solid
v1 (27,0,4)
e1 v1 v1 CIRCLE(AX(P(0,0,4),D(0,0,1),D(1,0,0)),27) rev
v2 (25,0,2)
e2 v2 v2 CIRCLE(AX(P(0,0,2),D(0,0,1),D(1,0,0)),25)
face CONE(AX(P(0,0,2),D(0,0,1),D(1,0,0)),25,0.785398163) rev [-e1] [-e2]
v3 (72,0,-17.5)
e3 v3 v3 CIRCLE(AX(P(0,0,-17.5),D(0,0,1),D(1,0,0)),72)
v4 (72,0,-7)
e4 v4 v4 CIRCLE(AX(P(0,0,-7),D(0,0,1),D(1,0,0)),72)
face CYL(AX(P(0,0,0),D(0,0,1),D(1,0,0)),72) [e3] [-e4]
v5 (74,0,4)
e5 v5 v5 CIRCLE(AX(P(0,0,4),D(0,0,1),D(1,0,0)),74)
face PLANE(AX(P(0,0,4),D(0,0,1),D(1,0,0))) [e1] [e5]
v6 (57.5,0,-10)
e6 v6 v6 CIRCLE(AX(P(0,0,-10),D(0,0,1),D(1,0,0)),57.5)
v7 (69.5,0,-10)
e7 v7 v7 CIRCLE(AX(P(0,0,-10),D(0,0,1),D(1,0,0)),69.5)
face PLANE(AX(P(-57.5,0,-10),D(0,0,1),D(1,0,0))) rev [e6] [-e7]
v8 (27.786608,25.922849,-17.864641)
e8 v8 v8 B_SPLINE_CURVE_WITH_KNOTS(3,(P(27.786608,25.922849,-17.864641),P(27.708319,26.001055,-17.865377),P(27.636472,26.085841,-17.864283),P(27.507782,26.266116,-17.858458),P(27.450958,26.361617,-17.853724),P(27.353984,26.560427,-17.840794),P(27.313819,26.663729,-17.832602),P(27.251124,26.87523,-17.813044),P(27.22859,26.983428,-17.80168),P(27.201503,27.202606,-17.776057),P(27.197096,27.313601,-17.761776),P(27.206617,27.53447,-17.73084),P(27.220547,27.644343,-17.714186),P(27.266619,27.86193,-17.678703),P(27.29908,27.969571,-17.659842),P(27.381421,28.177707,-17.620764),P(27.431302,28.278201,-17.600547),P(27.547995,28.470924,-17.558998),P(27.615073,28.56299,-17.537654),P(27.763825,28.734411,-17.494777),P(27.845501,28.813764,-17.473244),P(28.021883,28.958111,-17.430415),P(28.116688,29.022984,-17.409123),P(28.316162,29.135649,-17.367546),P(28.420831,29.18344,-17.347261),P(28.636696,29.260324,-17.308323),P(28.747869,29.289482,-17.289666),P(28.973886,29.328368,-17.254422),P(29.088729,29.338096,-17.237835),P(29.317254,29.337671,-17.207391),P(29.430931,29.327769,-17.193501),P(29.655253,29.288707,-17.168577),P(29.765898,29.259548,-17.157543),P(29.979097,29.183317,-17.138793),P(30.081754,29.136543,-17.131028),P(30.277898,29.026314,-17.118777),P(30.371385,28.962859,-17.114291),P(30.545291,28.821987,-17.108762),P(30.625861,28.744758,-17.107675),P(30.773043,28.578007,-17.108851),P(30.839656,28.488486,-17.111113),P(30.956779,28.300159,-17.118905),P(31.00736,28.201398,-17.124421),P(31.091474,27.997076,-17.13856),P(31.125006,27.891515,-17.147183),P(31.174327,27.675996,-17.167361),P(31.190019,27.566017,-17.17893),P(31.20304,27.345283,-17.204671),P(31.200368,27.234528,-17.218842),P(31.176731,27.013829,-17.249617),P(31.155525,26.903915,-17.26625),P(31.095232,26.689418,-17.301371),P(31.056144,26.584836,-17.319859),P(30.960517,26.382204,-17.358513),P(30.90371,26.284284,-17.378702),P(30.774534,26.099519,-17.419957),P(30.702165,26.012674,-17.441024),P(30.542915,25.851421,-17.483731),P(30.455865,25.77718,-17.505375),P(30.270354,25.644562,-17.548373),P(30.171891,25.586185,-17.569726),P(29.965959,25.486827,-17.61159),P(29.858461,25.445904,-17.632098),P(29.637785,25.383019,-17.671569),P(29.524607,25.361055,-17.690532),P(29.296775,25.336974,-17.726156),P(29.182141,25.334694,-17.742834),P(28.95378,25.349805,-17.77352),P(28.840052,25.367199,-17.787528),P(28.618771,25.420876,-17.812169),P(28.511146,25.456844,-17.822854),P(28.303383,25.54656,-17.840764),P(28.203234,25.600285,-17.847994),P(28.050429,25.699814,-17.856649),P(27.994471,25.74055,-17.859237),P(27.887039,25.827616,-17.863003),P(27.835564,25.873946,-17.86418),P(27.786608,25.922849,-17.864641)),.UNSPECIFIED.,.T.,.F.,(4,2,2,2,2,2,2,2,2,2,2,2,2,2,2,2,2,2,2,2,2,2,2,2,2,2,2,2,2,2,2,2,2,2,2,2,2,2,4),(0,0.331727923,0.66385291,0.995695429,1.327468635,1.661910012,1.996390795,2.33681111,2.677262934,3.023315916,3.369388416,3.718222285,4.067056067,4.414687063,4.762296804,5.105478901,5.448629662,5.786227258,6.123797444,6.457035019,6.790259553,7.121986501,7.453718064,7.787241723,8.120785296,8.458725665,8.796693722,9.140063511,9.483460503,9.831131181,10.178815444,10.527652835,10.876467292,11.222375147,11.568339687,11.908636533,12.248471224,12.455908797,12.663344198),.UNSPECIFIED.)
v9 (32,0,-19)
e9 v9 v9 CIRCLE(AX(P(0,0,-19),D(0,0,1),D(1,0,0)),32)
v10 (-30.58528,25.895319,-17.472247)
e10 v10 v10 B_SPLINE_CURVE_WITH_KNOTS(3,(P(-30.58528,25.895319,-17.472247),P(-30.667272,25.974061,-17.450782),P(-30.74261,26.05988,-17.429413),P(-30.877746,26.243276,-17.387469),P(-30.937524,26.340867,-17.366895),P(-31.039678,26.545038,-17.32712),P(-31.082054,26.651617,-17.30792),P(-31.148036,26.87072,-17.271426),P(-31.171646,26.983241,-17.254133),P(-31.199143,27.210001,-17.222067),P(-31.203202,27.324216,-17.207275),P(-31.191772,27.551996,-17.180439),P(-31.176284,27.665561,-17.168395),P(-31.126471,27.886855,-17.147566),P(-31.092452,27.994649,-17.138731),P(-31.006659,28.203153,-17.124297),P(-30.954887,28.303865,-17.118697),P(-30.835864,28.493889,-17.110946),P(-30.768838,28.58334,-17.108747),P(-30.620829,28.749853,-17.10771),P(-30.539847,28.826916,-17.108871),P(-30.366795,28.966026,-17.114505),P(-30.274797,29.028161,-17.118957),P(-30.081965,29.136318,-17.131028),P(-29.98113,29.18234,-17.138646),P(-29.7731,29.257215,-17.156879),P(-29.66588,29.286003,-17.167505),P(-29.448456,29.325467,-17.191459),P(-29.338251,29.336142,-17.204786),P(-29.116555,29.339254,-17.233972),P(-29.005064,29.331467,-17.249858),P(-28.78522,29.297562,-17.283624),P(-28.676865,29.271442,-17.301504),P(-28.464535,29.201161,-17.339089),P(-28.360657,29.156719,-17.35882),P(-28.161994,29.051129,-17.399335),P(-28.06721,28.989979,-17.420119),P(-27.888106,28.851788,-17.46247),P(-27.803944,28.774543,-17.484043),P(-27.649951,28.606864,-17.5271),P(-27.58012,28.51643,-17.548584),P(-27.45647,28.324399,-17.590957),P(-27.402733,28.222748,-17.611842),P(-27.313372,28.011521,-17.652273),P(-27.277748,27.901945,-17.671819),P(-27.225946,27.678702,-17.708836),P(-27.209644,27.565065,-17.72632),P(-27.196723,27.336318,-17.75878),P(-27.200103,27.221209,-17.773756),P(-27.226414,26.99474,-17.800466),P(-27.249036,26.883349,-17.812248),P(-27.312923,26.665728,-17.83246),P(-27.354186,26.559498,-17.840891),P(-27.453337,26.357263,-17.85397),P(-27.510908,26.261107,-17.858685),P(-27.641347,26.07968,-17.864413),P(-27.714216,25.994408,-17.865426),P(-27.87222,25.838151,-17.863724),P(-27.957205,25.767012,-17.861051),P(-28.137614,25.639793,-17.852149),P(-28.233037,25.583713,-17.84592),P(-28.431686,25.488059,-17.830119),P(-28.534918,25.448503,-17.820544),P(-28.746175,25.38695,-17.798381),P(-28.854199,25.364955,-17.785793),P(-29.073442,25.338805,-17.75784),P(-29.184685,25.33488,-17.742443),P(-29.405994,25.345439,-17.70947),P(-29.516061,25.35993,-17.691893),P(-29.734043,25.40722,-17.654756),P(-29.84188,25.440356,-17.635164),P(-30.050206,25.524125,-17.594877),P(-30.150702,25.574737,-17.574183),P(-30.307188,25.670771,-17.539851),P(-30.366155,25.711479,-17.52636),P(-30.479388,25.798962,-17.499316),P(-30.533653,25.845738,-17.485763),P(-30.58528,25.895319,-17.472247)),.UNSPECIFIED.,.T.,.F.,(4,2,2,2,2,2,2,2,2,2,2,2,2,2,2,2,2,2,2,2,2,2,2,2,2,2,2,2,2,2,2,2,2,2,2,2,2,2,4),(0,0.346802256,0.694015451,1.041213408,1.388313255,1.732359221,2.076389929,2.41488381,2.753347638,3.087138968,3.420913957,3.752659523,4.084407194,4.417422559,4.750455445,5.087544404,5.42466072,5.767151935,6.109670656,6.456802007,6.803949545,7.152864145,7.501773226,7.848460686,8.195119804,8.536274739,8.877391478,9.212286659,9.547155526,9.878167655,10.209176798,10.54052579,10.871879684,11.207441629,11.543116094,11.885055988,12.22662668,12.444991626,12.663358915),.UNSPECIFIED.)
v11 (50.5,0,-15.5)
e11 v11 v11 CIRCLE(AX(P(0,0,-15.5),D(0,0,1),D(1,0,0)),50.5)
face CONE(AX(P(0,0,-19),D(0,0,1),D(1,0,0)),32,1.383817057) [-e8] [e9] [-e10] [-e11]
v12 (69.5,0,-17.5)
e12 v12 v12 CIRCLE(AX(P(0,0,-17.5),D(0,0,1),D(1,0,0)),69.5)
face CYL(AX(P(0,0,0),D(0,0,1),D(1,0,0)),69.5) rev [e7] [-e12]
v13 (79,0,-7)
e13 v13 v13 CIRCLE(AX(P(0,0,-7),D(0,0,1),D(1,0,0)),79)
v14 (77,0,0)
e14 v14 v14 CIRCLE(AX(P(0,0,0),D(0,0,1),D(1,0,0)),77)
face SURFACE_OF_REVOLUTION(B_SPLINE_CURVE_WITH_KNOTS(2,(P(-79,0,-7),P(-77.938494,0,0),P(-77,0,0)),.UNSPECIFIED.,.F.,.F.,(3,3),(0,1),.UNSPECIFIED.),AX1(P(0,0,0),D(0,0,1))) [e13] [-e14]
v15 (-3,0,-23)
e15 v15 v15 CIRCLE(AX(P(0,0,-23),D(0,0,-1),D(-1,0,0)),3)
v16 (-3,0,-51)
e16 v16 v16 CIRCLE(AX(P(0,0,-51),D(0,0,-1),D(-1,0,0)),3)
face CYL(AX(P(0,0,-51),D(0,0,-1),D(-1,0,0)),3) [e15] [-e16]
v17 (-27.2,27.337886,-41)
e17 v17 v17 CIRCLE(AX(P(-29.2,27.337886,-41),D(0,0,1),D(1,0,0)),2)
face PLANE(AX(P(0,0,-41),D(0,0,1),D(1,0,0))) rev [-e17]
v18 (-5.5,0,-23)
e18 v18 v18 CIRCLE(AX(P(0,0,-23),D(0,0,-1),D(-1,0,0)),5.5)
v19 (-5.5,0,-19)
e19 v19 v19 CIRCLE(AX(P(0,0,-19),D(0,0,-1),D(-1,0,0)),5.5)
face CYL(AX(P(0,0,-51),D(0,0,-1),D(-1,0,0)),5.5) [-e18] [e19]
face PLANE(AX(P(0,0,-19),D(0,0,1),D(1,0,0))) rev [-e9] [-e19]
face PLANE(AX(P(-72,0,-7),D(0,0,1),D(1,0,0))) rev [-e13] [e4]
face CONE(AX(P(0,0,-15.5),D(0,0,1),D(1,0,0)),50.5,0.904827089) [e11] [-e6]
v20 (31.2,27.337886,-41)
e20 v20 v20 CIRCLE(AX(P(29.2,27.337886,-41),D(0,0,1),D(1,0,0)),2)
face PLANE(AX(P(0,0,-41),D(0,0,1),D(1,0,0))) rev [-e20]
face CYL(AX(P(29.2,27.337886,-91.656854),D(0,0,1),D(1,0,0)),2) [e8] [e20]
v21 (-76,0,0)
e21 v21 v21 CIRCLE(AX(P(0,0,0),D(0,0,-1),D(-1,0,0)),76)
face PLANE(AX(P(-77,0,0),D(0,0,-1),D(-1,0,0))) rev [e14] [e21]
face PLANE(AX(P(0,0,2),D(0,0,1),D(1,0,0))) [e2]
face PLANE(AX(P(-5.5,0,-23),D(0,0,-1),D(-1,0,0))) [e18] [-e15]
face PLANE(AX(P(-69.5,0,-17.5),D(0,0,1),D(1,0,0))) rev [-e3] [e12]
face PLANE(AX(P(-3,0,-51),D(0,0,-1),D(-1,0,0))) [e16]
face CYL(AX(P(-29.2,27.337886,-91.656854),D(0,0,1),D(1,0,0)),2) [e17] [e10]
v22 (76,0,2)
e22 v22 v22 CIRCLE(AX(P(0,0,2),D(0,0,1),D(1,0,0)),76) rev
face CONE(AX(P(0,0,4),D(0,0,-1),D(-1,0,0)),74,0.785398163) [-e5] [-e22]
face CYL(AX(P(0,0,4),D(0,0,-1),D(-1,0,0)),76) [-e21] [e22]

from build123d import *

# Parameters (mm, degrees)
SKETCH1_R           = 76
BOSS_EXTRUDE1_DEPTH = 4
CHAMFER1_SIZE       = 2
SKETCH2_R           = 25
CUT_EXTRUDE1_DEPTH  = 2
CHAMFER2_SIZE       = 2
SKETCH6_R           = 2
BOSS_EXTRUDE2_DEPTH = 34


with BuildPart() as part:
    # Sketch1 → Boss-Extrude1 (new body)
    with BuildSketch(Plane.XY):
        Circle(SKETCH1_R)
    extrude(amount=BOSS_EXTRUDE1_DEPTH)

    # Chamfer1
    chamfer1_edges = [part.edges().sort_by_distance(p)[0] for p in [
        (-76, 0, 4),
    ]]
    chamfer(chamfer1_edges, length=CHAMFER1_SIZE)

    # Sketch2 → Cut-Extrude1 (cut)
    with BuildSketch(Plane.XY.offset(4)):
        Circle(SKETCH2_R)
    extrude(amount=-CUT_EXTRUDE1_DEPTH, mode=Mode.SUBTRACT)

    # Chamfer2
    chamfer2_edges = [part.edges().sort_by_distance(p)[0] for p in [
        (-25, 0, 4),
    ]]
    chamfer(chamfer2_edges, length=CHAMFER2_SIZE - 0.0001)  # a hair under: the kernel refuses the full size

    # Sketch3 → Revolve1 (revolve)
    with BuildSketch(Plane(origin=(0, 0, 0), x_dir=(1, 0, 0), z_dir=(0, 1, 0)), mode=Mode.PRIVATE) as revolve1_sk:
        with BuildLine():
            Line((0, 0), (0, 19))
            Line((0, 19), (-32, 19))
            Line((-32, 19), (-50.5, 15.5))
            Line((-50.5, 15.5), (-57.5, 10))
            Line((-57.5, 10), (-69.5, 10))
            Line((-69.5, 10), (-69.5, 17.5))
            Line((-69.5, 17.5), (-72, 17.5))
            Line((-72, 17.5), (-72, 7))
            Line((-72, 7), (-79, 7))
            add(Edge.make_bspline(
                [(-79, 7), (-77.938493586, 0), (-77, 0)],
                knots=[0, 0, 0, 1, 1, 1], degree=2))
            Line((-77, 0), (0, 0))
        make_face()
    revolve(revolve1_sk.sketch.rotate(Axis((0, 0, 0), (0, 0, -1)), 180), axis=Axis((0, 0, 0), (0, 0, -1)))

    # Sketch5 → Revolve2 (revolve)
    with BuildSketch(Plane(origin=(0, 0, 0), x_dir=(1, 0, 0), z_dir=(0, 1, 0))):
        Polygon((0, 19), (-5.5, 19), (-5.5, 23), (-3, 23), (-3, 51), (0, 51), align=None)
    revolve(axis=Axis((0, 0, -51), (0, 0, 1)))

    # Sketch6 → Boss-Extrude2 (add)
    with BuildSketch(Plane(origin=(0, 0, -7), x_dir=(-1, 0, 0), z_dir=(0, 0, -1))):
        with Locations(Location((-29.2, 27.3378858, 0), (0, 0, 180))):
            Circle(SKETCH6_R)
        with Locations(Location((29.2, 27.3378858, 0), (0, 0, 180))):
            Circle(SKETCH6_R)
    extrude(amount=BOSS_EXTRUDE2_DEPTH)


solid = part.part
